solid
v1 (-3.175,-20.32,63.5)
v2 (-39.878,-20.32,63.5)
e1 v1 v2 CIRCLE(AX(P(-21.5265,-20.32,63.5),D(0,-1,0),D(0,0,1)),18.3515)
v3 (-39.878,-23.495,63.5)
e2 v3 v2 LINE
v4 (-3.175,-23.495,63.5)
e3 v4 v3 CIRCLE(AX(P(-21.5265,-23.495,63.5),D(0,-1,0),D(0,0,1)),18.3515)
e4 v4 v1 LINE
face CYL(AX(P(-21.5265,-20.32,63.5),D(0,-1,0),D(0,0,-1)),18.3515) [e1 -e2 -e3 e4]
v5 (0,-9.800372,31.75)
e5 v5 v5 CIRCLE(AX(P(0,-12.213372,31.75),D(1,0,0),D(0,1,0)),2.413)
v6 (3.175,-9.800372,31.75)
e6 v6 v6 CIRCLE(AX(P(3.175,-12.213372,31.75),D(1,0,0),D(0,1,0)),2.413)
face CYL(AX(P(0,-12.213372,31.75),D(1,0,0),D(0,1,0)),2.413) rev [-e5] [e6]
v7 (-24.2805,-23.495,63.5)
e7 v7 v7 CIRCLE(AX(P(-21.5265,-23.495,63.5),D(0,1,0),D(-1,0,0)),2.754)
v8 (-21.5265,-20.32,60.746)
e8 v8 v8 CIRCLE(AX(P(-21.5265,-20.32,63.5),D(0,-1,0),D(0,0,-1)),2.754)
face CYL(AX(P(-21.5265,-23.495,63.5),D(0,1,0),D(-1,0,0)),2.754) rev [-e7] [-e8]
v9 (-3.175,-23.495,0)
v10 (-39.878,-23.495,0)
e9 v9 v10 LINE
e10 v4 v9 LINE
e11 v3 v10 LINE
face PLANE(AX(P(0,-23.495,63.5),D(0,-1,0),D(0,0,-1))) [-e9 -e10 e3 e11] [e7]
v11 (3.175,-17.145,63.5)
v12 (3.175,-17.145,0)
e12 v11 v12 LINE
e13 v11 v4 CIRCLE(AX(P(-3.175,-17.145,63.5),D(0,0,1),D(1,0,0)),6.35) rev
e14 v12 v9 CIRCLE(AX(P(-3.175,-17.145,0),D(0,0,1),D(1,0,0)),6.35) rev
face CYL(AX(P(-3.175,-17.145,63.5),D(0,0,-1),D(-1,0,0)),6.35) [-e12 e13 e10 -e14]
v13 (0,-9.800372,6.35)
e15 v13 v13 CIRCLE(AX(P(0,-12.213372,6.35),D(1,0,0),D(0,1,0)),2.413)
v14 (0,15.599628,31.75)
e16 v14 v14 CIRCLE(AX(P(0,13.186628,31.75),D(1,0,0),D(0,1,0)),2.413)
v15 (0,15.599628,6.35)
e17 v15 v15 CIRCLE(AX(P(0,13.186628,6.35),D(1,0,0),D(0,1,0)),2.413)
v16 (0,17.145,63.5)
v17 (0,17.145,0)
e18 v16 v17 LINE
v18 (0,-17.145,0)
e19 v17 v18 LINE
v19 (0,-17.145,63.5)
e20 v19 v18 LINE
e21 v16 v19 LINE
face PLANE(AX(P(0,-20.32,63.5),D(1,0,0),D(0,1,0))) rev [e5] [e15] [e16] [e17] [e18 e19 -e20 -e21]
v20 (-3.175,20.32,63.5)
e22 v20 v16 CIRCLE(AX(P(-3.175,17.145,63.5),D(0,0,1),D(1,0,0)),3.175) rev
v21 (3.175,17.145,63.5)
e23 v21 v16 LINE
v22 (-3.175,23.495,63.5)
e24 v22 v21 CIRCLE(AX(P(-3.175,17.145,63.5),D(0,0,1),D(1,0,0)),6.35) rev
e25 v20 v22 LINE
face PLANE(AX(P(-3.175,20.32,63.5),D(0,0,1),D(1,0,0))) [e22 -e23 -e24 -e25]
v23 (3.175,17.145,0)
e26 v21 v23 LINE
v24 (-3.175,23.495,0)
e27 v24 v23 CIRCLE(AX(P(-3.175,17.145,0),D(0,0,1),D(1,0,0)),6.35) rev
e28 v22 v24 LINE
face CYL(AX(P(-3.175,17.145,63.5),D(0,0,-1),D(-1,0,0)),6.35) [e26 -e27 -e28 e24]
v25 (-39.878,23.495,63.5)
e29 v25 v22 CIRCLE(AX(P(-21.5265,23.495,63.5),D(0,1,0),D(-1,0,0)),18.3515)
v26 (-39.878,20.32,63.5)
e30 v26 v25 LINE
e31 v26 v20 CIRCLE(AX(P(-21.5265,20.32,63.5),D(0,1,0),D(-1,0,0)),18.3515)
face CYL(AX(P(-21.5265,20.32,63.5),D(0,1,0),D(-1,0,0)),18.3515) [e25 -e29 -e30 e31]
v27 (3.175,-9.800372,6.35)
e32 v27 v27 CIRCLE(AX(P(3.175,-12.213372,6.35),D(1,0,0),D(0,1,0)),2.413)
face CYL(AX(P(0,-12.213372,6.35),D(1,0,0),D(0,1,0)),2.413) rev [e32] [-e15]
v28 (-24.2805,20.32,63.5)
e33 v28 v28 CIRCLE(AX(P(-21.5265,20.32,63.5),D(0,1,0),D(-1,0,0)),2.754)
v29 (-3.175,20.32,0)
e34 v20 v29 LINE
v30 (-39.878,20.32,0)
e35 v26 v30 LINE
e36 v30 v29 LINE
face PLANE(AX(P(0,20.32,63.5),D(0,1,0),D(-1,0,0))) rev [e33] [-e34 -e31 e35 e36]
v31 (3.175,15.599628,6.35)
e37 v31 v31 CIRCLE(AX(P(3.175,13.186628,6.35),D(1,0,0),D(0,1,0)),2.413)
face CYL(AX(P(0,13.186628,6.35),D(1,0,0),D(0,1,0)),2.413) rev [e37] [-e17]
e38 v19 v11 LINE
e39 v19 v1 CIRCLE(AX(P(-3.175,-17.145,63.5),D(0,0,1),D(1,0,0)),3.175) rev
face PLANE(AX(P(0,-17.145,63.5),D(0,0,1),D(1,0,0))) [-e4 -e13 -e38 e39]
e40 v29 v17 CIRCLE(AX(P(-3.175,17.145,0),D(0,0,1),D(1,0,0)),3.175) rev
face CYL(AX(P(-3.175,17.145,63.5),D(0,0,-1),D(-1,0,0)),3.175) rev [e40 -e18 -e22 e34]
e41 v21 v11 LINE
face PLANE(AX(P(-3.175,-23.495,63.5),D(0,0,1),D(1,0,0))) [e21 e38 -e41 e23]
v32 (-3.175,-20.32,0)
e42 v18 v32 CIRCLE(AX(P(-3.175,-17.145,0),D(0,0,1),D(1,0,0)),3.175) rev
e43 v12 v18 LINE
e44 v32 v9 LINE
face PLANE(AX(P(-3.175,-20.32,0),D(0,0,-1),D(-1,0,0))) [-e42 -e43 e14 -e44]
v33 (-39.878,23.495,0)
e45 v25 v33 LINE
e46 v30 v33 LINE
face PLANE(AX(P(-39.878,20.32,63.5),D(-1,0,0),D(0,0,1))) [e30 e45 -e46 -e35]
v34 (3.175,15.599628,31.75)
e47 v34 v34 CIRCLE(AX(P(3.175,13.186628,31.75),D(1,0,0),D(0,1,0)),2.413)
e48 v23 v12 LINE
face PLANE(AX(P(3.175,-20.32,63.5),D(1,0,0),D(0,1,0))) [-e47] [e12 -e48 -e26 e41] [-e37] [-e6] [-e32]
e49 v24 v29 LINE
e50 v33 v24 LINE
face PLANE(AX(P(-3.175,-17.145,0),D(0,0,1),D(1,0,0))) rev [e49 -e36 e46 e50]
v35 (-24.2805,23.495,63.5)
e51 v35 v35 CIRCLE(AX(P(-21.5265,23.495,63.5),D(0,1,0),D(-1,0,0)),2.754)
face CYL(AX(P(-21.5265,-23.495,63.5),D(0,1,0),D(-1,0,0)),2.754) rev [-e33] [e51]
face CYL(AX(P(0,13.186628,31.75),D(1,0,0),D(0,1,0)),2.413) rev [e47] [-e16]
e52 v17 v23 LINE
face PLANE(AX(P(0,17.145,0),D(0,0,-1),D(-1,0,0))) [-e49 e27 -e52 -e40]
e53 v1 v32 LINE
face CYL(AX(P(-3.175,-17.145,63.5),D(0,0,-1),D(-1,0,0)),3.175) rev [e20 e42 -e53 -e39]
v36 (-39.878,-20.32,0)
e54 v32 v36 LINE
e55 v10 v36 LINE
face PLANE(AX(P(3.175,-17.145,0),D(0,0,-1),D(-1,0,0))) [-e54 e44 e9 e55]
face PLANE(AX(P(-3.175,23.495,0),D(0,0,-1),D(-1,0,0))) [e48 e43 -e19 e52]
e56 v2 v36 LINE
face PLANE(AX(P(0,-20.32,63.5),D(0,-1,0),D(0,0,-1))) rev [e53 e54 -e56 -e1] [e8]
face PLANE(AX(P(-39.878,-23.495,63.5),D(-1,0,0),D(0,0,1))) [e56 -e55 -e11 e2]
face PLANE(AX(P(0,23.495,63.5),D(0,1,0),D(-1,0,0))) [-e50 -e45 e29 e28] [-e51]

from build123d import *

# Parameters (mm, degrees)
BASE_FLANGE1_DEPTH      = 63.5
BOSS_EXTRUDE1_DEPTH     = 3.175
BOSS_EXTRUDE2_START     = -3.175
BOSS_EXTRUDE2_DEPTH     = 3.175
SKETCH8_R               = 2.413
CUT_EXTRUDE1_DEPTH      = 3.175
CUT_EXTRUDE2_DEPTH      = 103.459665412
CUT_EXTRUDE2_DEPTH_BACK = 103.459665412
SKETCH10_R              = 2.753999953


# Sheet-metal steps are written as plain solids
with BuildPart() as part:
    # Sketch1 → Base-Flange1 (new body)
    with BuildSketch(Plane.XY):
        with BuildLine():
            Line((-39.878, -20.32), (-3.175, -20.32))
            ThreePointArc((-3.175, -20.32), (-0.92993597, -19.39006403), (0, -17.145))
            Line((0, -17.145), (0, 17.145))
            ThreePointArc((0, 17.145), (-0.92993597, 19.39006403), (-3.175, 20.32))
            Line((-3.175, 20.32), (-39.878, 20.32))
            Line((-39.878, 20.32), (-39.878, 23.495))
            Line((-39.878, 23.495), (-3.175, 23.495))
            ThreePointArc((-3.175, 23.495), (1.315128061, 21.635128061), (3.175, 17.145))
            Line((3.175, 17.145), (3.175, -17.145))
            ThreePointArc((3.175, -17.145), (1.315128061, -21.635128061), (-3.175, -23.495))
            Line((-3.175, -23.495), (-39.878, -23.495))
            Line((-39.878, -23.495), (-39.878, -20.32))
        make_face()
    extrude(amount=BASE_FLANGE1_DEPTH)

    # Sketch6 → Boss-Extrude1 (add)
    with BuildSketch(Plane(origin=(0, 23.495, 0), x_dir=(1, 0, 0), z_dir=(0, 1, 0))):
        with BuildLine():
            Line((-39.878, -63.5), (-3.175, -63.5))
            ThreePointArc((-3.175, -63.5), (-21.5265, -81.8515), (-39.878, -63.5))
        make_face()
    extrude(amount=-BOSS_EXTRUDE1_DEPTH)

    # Sketch7 → Boss-Extrude2 (add)
    with BuildSketch(Plane.XZ.offset(23.495).offset(BOSS_EXTRUDE2_START)):
        with BuildLine():
            Line((-3.175, 63.5), (-39.878, 63.5))
            ThreePointArc((-39.878, 63.5), (-21.5265, 81.8515), (-3.175, 63.5))
        make_face()
    extrude(amount=BOSS_EXTRUDE2_DEPTH)

    # Sketch8 → Cut-Extrude1 (cut)
    with BuildSketch(Plane(origin=(3.175, 0, 0), x_dir=(0, 0, -1), z_dir=(1, 0, 0))):
        with Locations(Location((-6.35, 13.18662794, 0), (0, 0, 90))):
            Circle(SKETCH8_R)
        with Locations(Location((-31.75, 13.18662794, 0), (0, 0, 90))):
            Circle(SKETCH8_R)
        with Locations(Location((-31.75, -12.21337206, 0), (0, 0, 90))):
            Circle(SKETCH8_R)
        with Locations(Location((-6.35, -12.21337206, 0), (0, 0, 90))):
            Circle(SKETCH8_R)
    extrude(amount=-CUT_EXTRUDE1_DEPTH, mode=Mode.SUBTRACT)

    # Sketch10 → Cut-Extrude2 (cut, two sides: drawn at the far end of the back side and taken through both)
    with BuildSketch(Plane(origin=(0, 23.495, 0), x_dir=(1, 0, 0), z_dir=(0, 1, 0)).offset(-CUT_EXTRUDE2_DEPTH_BACK)):
        with Locations(Location((-21.5265, -63.5, 0), (0, 0, 180))):
            Circle(SKETCH10_R)
    extrude(amount=CUT_EXTRUDE2_DEPTH + CUT_EXTRUDE2_DEPTH_BACK, mode=Mode.SUBTRACT)


solid = part.part
